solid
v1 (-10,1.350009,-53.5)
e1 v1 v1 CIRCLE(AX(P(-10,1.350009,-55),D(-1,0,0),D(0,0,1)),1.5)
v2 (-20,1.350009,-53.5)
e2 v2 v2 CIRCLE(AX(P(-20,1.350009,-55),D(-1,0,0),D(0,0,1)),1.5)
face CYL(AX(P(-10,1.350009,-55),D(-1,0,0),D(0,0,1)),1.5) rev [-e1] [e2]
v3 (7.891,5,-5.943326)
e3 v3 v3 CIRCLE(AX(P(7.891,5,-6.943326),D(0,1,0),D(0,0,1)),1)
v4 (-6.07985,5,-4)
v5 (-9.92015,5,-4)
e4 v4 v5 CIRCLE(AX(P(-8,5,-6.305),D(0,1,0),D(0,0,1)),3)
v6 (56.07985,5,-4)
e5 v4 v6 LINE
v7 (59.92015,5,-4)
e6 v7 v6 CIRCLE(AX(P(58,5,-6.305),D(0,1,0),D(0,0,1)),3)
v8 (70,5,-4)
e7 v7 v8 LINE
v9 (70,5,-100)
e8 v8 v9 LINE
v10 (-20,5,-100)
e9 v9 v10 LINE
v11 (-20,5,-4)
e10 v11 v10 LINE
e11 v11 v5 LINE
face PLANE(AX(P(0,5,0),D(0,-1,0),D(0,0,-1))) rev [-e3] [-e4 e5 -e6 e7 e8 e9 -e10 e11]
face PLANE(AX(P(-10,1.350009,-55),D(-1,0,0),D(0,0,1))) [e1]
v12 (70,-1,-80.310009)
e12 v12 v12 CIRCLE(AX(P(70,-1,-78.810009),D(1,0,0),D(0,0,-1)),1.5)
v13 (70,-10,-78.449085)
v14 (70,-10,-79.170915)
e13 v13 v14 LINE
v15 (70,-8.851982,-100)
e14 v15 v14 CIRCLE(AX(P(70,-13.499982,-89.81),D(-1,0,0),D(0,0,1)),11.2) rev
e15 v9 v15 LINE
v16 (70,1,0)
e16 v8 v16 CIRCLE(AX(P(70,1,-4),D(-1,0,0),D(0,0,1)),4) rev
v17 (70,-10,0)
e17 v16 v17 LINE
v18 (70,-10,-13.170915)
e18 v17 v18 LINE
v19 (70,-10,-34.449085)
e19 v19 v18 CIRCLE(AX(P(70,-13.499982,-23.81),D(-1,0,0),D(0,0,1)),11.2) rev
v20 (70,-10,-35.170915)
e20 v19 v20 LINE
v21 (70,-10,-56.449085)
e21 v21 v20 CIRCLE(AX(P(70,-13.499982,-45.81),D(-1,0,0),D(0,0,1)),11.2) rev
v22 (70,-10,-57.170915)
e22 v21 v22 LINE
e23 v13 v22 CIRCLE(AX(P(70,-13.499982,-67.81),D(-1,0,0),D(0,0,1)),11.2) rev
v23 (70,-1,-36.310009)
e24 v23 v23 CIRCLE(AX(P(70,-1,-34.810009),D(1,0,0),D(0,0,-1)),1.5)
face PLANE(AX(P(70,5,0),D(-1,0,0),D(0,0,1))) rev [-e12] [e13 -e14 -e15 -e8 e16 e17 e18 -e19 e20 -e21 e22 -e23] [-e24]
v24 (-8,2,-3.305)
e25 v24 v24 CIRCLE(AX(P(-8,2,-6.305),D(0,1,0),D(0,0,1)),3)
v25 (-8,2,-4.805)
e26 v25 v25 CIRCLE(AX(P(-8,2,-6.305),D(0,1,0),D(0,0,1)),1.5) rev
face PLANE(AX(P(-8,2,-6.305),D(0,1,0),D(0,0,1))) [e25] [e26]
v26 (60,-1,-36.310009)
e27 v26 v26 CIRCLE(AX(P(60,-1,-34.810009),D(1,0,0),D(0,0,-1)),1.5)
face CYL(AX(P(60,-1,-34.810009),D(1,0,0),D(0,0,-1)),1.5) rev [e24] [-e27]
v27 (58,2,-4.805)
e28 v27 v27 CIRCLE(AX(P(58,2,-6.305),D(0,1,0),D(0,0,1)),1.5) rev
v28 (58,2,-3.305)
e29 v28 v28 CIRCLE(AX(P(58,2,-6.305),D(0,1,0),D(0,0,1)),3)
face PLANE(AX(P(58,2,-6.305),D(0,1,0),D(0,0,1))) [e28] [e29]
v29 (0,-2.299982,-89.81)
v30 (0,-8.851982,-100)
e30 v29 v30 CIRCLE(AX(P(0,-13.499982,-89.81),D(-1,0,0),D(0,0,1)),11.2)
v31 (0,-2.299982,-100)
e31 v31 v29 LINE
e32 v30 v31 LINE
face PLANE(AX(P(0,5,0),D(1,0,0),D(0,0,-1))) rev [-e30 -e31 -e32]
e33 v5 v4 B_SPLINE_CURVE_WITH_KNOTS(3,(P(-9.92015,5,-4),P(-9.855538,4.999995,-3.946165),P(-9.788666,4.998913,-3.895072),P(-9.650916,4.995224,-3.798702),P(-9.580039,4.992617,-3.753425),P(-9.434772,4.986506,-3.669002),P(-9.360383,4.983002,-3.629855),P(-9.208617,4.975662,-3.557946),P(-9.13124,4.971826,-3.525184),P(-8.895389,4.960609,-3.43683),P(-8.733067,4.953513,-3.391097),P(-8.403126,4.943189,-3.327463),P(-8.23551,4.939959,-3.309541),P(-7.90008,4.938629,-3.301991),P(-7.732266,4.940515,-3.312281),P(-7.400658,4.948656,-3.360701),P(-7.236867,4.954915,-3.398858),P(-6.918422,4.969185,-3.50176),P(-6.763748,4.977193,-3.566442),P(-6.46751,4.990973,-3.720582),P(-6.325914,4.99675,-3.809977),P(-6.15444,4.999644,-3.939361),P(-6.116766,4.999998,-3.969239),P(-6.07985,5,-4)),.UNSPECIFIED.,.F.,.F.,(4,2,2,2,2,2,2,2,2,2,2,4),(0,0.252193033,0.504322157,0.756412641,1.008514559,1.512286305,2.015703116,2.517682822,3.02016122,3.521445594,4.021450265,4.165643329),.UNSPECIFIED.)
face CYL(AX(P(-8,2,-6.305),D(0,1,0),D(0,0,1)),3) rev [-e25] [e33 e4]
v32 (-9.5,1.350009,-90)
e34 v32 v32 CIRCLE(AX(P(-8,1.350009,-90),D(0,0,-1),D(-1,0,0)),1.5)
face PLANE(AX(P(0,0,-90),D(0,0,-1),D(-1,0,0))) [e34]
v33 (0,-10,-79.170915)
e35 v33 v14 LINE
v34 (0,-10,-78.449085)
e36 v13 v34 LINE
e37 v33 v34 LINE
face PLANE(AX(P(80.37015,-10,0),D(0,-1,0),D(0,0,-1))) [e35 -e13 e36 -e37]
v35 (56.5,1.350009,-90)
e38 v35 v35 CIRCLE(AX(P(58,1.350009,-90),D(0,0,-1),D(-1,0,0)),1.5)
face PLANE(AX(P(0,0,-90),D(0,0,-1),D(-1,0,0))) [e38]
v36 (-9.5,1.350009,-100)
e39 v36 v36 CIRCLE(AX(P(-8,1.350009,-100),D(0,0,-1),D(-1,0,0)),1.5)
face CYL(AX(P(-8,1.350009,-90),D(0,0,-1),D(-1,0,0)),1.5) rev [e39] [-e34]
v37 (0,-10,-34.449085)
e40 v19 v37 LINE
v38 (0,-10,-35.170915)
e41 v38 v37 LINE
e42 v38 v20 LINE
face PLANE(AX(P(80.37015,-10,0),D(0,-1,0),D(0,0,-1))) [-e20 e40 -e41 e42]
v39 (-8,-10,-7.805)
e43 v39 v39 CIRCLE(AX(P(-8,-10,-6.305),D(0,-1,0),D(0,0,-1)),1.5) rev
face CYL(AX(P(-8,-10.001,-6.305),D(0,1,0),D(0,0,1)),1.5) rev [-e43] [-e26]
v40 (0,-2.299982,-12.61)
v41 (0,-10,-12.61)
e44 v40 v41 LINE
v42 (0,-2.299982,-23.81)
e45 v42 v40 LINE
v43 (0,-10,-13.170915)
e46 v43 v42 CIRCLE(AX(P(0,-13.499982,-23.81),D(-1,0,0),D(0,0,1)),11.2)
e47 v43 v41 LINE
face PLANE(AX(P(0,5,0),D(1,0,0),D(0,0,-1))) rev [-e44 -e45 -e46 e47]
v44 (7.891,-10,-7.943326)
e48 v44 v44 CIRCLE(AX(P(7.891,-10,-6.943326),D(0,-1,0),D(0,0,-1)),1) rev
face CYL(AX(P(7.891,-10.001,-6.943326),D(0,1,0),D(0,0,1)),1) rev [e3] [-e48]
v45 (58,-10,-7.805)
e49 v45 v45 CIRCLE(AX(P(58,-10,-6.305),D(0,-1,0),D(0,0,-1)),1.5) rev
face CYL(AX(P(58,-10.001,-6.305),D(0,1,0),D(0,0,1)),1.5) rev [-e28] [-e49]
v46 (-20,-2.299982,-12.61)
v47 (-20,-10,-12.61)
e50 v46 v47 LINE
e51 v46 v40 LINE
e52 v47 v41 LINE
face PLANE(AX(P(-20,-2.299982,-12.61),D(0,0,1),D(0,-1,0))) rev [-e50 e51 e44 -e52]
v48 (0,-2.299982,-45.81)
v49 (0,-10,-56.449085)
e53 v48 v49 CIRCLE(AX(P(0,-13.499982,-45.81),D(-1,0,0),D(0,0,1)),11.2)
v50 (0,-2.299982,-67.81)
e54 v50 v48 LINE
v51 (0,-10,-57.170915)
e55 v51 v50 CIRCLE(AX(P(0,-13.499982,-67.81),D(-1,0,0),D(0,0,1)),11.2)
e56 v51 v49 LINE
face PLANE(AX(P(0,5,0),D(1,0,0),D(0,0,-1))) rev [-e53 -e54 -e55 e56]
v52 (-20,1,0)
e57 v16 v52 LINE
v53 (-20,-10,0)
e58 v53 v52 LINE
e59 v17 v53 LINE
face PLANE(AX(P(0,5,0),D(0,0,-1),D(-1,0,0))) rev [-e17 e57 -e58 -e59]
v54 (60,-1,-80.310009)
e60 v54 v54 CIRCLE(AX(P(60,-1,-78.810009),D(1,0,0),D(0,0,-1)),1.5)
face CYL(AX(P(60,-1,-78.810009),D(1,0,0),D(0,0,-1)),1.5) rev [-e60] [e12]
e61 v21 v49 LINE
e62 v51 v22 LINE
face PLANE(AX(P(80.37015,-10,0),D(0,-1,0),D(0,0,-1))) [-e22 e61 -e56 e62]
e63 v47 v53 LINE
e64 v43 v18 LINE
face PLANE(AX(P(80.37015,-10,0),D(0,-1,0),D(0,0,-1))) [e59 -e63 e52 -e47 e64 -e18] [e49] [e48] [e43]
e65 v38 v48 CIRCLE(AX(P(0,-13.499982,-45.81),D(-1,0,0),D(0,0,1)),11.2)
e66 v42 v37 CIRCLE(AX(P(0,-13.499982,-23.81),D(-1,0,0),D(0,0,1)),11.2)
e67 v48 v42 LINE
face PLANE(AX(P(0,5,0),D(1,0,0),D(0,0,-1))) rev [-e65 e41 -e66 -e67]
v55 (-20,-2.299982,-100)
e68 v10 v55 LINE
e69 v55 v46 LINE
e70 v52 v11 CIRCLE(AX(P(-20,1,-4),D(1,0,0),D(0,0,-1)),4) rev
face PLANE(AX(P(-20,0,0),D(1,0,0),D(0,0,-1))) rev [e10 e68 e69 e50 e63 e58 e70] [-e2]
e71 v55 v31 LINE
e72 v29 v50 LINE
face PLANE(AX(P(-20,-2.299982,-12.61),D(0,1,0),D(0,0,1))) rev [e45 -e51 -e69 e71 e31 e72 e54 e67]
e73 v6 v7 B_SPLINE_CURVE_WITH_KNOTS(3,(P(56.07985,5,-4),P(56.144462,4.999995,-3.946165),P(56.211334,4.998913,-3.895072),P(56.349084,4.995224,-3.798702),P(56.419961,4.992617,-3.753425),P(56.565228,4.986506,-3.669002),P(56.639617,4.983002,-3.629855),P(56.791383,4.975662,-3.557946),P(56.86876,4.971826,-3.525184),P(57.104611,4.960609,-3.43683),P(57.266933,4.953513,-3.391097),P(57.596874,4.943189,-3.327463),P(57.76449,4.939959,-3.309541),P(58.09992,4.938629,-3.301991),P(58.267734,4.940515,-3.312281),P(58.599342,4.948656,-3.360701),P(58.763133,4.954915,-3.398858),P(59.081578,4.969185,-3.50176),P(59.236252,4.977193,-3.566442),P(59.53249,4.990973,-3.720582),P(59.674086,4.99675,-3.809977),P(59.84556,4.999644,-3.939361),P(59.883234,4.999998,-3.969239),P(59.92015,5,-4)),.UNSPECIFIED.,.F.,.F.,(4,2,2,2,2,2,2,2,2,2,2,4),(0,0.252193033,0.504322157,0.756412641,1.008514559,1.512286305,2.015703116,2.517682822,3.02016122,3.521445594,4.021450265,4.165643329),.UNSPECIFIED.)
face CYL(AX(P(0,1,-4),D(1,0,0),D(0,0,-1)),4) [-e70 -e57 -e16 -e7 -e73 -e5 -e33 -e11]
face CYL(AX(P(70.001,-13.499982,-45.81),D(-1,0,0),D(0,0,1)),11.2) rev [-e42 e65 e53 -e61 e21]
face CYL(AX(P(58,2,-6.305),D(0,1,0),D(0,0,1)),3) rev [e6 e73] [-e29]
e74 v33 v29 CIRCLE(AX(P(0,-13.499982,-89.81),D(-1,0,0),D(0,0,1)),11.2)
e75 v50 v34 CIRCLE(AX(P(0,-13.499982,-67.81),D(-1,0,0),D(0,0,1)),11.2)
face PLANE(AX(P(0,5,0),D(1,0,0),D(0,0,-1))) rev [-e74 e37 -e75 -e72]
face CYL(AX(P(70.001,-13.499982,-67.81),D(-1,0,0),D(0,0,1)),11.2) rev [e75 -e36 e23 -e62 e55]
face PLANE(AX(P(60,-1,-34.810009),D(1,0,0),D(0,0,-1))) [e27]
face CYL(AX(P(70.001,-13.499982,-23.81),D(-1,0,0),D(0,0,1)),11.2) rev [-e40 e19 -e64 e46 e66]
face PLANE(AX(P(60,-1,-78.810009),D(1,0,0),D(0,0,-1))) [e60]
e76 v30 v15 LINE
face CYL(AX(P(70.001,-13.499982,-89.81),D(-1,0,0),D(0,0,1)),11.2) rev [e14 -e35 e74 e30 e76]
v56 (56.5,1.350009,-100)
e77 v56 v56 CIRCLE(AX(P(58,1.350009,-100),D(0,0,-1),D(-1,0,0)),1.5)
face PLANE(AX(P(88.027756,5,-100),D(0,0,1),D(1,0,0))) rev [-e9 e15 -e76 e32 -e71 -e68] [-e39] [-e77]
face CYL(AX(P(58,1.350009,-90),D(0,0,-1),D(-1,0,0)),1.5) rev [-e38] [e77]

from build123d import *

# Parameters (mm, degrees)
SKETCH_1_W          = 70
SKETCH_1_H          = 110
EXTRUDE_1_DEPTH     = 5
EXTRUDE_2_DEPTH     = 70
CUT_EXTRUDE_1_DEPTH = 70
SKETCH_4_W          = 12.81
SKETCH_4_H          = 10
EXTRUDE_3_DEPTH     = 70
SKETCH_5_W          = 10
SKETCH_5_H          = 15
CUT_EXTRUDE_2_DEPTH = 70
CUT_EXTRUDE_3_REACH = 124.474
SKETCH_6_R          = 11.2
SKETCH_7_R          = 1.5
CUT_EXTRUDE_4_DEPTH = 10
EXTRUDE_4_DEPTH     = 20
SKETCH_9_R          = 1.5
CUT_EXTRUDE_5_DEPTH = 10
CUT_EXTRUDE_6_REACH = 124.984
SKETCH_10_R         = 1.5
SKETCH_11_R         = 3
CUT_EXTRUDE_7_DEPTH = 3
CUT_EXTRUDE_8_REACH = 124.984
SKETCH_12_R         = 1
FILLET_1_R          = 4
SKETCH_13_R         = 1.5
CUT_EXTRUDE_9_DEPTH = 10


with BuildPart() as part:
    # 草图1 → 凸台-拉伸1 (new body)
    with BuildSketch(Plane(origin=(0, 0, 0), x_dir=(1, 0, 0), z_dir=(0, 1, 0))):
        with Locations((35, 55)):
            Rectangle(SKETCH_1_W, SKETCH_1_H)
    extrude(amount=EXTRUDE_1_DEPTH)

    # 草图2 → 凸台-拉伸2 (add)
    with BuildSketch(Plane.ZY):
        with BuildLine():
            Line((-110, -13.499982039), (-100.81, -13.499982039))
            ThreePointArc((-100.81, -13.499982039), (-89.81, -2.499982039), (-78.81, -13.499982039))
            ThreePointArc((-78.81, -13.499982039), (-67.81, -2.499982039), (-56.81, -13.499982039))
            ThreePointArc((-56.81, -13.499982039), (-45.81, -2.499982039), (-34.81, -13.499982039))
            ThreePointArc((-34.81, -13.499982039), (-23.81, -2.499982039), (-12.81, -13.499982039))
            Line((-12.81, -13.499982039), (-12.81, 0))
            Line((-12.81, 0), (-110, 0))
            Line((-110, 0), (-110, -13.499982039))
        make_face()
    extrude(amount=-EXTRUDE_2_DEPTH)

    # 草图3 → 切除-拉伸1 (cut)
    with BuildSketch(Plane.ZY):
        with BuildLine():
            Line((-100.238332835, -10), (-110, -10))
            Line((-110, -10), (-110, -13.499982039))
            Line((-110, -13.499982039), (-100.81, -13.499982039))
            ThreePointArc((-100.81, -13.499982039), (-100.666142528, -11.726801449), (-100.238332835, -10))
        make_face()
        with BuildLine():
            Line((-78.238332835, -10), (-79.381667165, -10))
            ThreePointArc((-79.381667165, -10), (-78.953857472, -11.726801449), (-78.81, -13.499982039))
            ThreePointArc((-78.81, -13.499982039), (-78.666142528, -11.726801449), (-78.238332835, -10))
        make_face()
        with BuildLine():
            Line((-56.238332835, -10), (-57.381667165, -10))
            ThreePointArc((-57.381667165, -10), (-56.953857472, -11.726801449), (-56.81, -13.499982039))
            ThreePointArc((-56.81, -13.499982039), (-56.666142528, -11.726801449), (-56.238332835, -10))
        make_face()
        with BuildLine():
            Line((-12.81, -13.499982039), (-12.81, -10))
            Line((-12.81, -10), (-13.381667165, -10))
            ThreePointArc((-13.381667165, -10), (-12.953857472, -11.726801449), (-12.81, -13.499982039))
        make_face()
        with BuildLine():
            Line((-34.238332835, -10), (-35.381667165, -10))
            ThreePointArc((-35.381667165, -10), (-34.953857472, -11.726801449), (-34.81, -13.499982039))
            ThreePointArc((-34.81, -13.499982039), (-34.666142528, -11.726801449), (-34.238332835, -10))
        make_face()
    extrude(amount=-CUT_EXTRUDE_1_DEPTH, mode=Mode.SUBTRACT)

    # 草图4 → 凸台-拉伸3 (add)
    with BuildSketch(Plane.ZY):
        with Locations((-6.405, -5)):
            Rectangle(SKETCH_4_W, SKETCH_4_H)
    extrude(amount=-EXTRUDE_3_DEPTH)

    # 草图5 → 切除-拉伸2 (cut)
    with BuildSketch(Plane.ZY):
        with Locations((-105, -2.5)):
            Rectangle(SKETCH_5_W, SKETCH_5_H)
    extrude(amount=-CUT_EXTRUDE_2_DEPTH, mode=Mode.SUBTRACT)

    # 草图6 → 切除-拉伸3 (cut, up to next)
    with BuildSketch(Plane.ZY, mode=Mode.PRIVATE) as cut_extrude_3_sk1:
        with Locations((-89.81, -13.499982039)):
            Circle(SKETCH_6_R)
    cut_extrude_3_tool1 = extrude(cut_extrude_3_sk1.sketch, amount=-CUT_EXTRUDE_3_REACH, mode=Mode.PRIVATE) & part.part
    # 草图6 → 切除-拉伸3 (cut, up to next)
    with BuildSketch(Plane.ZY, mode=Mode.PRIVATE) as cut_extrude_3_sk2:
        with Locations((-67.81, -13.499982039)):
            Circle(SKETCH_6_R)
    cut_extrude_3_tool2 = extrude(cut_extrude_3_sk2.sketch, amount=-CUT_EXTRUDE_3_REACH, mode=Mode.PRIVATE) & part.part
    # 草图6 → 切除-拉伸3 (cut, up to next)
    with BuildSketch(Plane.ZY, mode=Mode.PRIVATE) as cut_extrude_3_sk3:
        with Locations((-45.81, -13.499982039)):
            Circle(SKETCH_6_R)
    cut_extrude_3_tool3 = extrude(cut_extrude_3_sk3.sketch, amount=-CUT_EXTRUDE_3_REACH, mode=Mode.PRIVATE) & part.part
    # 草图6 → 切除-拉伸3 (cut, up to next)
    with BuildSketch(Plane.ZY, mode=Mode.PRIVATE) as cut_extrude_3_sk4:
        with Locations((-23.81, -13.499982039)):
            Circle(SKETCH_6_R)
    cut_extrude_3_tool4 = extrude(cut_extrude_3_sk4.sketch, amount=-CUT_EXTRUDE_3_REACH, mode=Mode.PRIVATE) & part.part
    add(cut_extrude_3_tool1.solids().sort_by_distance((0, -13.499982, -89.81))[0], mode=Mode.SUBTRACT)
    add(cut_extrude_3_tool2.solids().sort_by_distance((0, -13.499982, -67.81))[0], mode=Mode.SUBTRACT)
    add(cut_extrude_3_tool3.solids().sort_by_distance((0, -13.499982, -45.81))[0], mode=Mode.SUBTRACT)
    add(cut_extrude_3_tool4.solids().sort_by_distance((0, -13.499982, -23.81))[0], mode=Mode.SUBTRACT)

    # 草图7 → 切除-拉伸4 (cut)
    with BuildSketch(Plane(origin=(70, 0, 0), x_dir=(0, 0, -1), z_dir=(1, 0, 0))):
        with Locations((78.81000898, -1)):
            Circle(SKETCH_7_R)
        with Locations((34.81000898, -1)):
            Circle(SKETCH_7_R)
    extrude(amount=-CUT_EXTRUDE_4_DEPTH, mode=Mode.SUBTRACT)

    # 草图8 → 凸台-拉伸4 (add)
    with BuildSketch(Plane.ZY):
        Polygon((0, 5), (-100, 5), (-100, -2.299982039), (-12.61, -2.299982039), (-12.61, -10), (0, -10), (0, -2.299982039), align=None)
    extrude(amount=EXTRUDE_4_DEPTH)

    # 草图9 → 切除-拉伸5 (cut)
    with BuildSketch(Plane(origin=(0, 0, -100), x_dir=(-1, 0, 0), z_dir=(0, 0, -1))):
        with Locations((-58, 1.35000898)):
            Circle(SKETCH_9_R)
        with Locations((8, 1.35000898)):
            Circle(SKETCH_9_R)
    extrude(amount=-CUT_EXTRUDE_5_DEPTH, mode=Mode.SUBTRACT)

    # 草图10 → 切除-拉伸6 (cut, up to next)
    with BuildSketch(Plane(origin=(0, 5, 0), x_dir=(1, 0, 0), z_dir=(0, 1, 0)), mode=Mode.PRIVATE) as cut_extrude_6_sk1:
        with Locations(Location((-8, 6.305, 0), (0, 0, 270))):
            Circle(SKETCH_10_R)
    cut_extrude_6_tool1 = extrude(cut_extrude_6_sk1.sketch, amount=-CUT_EXTRUDE_6_REACH, mode=Mode.PRIVATE) & part.part
    # 草图10 → 切除-拉伸6 (cut, up to next)
    with BuildSketch(Plane(origin=(0, 5, 0), x_dir=(1, 0, 0), z_dir=(0, 1, 0)), mode=Mode.PRIVATE) as cut_extrude_6_sk2:
        with Locations(Location((58, 6.305, 0), (0, 0, 270))):
            Circle(SKETCH_10_R)
    cut_extrude_6_tool2 = extrude(cut_extrude_6_sk2.sketch, amount=-CUT_EXTRUDE_6_REACH, mode=Mode.PRIVATE) & part.part
    add(cut_extrude_6_tool1.solids().sort_by_distance((-8, 5, -6.305))[0], mode=Mode.SUBTRACT)
    add(cut_extrude_6_tool2.solids().sort_by_distance((58, 5, -6.305))[0], mode=Mode.SUBTRACT)

    # 草图11 → 切除-拉伸7 (cut)
    with BuildSketch(Plane(origin=(0, 5, 0), x_dir=(1, 0, 0), z_dir=(0, 1, 0))):
        with Locations(Location((-8, 6.305, 0), (0, 0, 270))):
            Circle(SKETCH_11_R)
        with Locations(Location((58, 6.305, 0), (0, 0, 270))):
            Circle(SKETCH_11_R)
    extrude(amount=-CUT_EXTRUDE_7_DEPTH, mode=Mode.SUBTRACT)

    # 草图12 → 切除-拉伸8 (cut, up to next)
    with BuildSketch(Plane(origin=(0, 5, 0), x_dir=(1, 0, 0), z_dir=(0, 1, 0)), mode=Mode.PRIVATE) as cut_extrude_8_sk1:
        with Locations(Location((7.891, 6.943325734, 0), (0, 0, 270))):
            Circle(SKETCH_12_R)
    cut_extrude_8_tool1 = extrude(cut_extrude_8_sk1.sketch, amount=-CUT_EXTRUDE_8_REACH, mode=Mode.PRIVATE) & part.part
    add(cut_extrude_8_tool1.solids().sort_by_distance((7.891, 5, -6.943326))[0], mode=Mode.SUBTRACT)

    # 圆角1
    # the kernel refuses this fillet: 4 mm, written as the material it takes off along each edge
    with BuildSketch(Plane(origin=(80, 5, 0), x_dir=(0, -1, 0), z_dir=(-1, 0, 0))) as fillet_1_piece_1:
        with BuildLine():
            CenterArc((FILLET_1_R, -FILLET_1_R), FILLET_1_R, 90, 90)
            Line((0, -FILLET_1_R), (0, 0))
            Line((0, 0), (FILLET_1_R, 0))
        make_face()
    extrude(amount=110, mode=Mode.SUBTRACT)

    # 草图13 → 切除-拉伸9 (cut)
    with BuildSketch(Plane.ZY.offset(20)):
        with Locations((-55, 1.35000898)):
            Circle(SKETCH_13_R)
    extrude(amount=-CUT_EXTRUDE_9_DEPTH, mode=Mode.SUBTRACT)


solid = part.part
